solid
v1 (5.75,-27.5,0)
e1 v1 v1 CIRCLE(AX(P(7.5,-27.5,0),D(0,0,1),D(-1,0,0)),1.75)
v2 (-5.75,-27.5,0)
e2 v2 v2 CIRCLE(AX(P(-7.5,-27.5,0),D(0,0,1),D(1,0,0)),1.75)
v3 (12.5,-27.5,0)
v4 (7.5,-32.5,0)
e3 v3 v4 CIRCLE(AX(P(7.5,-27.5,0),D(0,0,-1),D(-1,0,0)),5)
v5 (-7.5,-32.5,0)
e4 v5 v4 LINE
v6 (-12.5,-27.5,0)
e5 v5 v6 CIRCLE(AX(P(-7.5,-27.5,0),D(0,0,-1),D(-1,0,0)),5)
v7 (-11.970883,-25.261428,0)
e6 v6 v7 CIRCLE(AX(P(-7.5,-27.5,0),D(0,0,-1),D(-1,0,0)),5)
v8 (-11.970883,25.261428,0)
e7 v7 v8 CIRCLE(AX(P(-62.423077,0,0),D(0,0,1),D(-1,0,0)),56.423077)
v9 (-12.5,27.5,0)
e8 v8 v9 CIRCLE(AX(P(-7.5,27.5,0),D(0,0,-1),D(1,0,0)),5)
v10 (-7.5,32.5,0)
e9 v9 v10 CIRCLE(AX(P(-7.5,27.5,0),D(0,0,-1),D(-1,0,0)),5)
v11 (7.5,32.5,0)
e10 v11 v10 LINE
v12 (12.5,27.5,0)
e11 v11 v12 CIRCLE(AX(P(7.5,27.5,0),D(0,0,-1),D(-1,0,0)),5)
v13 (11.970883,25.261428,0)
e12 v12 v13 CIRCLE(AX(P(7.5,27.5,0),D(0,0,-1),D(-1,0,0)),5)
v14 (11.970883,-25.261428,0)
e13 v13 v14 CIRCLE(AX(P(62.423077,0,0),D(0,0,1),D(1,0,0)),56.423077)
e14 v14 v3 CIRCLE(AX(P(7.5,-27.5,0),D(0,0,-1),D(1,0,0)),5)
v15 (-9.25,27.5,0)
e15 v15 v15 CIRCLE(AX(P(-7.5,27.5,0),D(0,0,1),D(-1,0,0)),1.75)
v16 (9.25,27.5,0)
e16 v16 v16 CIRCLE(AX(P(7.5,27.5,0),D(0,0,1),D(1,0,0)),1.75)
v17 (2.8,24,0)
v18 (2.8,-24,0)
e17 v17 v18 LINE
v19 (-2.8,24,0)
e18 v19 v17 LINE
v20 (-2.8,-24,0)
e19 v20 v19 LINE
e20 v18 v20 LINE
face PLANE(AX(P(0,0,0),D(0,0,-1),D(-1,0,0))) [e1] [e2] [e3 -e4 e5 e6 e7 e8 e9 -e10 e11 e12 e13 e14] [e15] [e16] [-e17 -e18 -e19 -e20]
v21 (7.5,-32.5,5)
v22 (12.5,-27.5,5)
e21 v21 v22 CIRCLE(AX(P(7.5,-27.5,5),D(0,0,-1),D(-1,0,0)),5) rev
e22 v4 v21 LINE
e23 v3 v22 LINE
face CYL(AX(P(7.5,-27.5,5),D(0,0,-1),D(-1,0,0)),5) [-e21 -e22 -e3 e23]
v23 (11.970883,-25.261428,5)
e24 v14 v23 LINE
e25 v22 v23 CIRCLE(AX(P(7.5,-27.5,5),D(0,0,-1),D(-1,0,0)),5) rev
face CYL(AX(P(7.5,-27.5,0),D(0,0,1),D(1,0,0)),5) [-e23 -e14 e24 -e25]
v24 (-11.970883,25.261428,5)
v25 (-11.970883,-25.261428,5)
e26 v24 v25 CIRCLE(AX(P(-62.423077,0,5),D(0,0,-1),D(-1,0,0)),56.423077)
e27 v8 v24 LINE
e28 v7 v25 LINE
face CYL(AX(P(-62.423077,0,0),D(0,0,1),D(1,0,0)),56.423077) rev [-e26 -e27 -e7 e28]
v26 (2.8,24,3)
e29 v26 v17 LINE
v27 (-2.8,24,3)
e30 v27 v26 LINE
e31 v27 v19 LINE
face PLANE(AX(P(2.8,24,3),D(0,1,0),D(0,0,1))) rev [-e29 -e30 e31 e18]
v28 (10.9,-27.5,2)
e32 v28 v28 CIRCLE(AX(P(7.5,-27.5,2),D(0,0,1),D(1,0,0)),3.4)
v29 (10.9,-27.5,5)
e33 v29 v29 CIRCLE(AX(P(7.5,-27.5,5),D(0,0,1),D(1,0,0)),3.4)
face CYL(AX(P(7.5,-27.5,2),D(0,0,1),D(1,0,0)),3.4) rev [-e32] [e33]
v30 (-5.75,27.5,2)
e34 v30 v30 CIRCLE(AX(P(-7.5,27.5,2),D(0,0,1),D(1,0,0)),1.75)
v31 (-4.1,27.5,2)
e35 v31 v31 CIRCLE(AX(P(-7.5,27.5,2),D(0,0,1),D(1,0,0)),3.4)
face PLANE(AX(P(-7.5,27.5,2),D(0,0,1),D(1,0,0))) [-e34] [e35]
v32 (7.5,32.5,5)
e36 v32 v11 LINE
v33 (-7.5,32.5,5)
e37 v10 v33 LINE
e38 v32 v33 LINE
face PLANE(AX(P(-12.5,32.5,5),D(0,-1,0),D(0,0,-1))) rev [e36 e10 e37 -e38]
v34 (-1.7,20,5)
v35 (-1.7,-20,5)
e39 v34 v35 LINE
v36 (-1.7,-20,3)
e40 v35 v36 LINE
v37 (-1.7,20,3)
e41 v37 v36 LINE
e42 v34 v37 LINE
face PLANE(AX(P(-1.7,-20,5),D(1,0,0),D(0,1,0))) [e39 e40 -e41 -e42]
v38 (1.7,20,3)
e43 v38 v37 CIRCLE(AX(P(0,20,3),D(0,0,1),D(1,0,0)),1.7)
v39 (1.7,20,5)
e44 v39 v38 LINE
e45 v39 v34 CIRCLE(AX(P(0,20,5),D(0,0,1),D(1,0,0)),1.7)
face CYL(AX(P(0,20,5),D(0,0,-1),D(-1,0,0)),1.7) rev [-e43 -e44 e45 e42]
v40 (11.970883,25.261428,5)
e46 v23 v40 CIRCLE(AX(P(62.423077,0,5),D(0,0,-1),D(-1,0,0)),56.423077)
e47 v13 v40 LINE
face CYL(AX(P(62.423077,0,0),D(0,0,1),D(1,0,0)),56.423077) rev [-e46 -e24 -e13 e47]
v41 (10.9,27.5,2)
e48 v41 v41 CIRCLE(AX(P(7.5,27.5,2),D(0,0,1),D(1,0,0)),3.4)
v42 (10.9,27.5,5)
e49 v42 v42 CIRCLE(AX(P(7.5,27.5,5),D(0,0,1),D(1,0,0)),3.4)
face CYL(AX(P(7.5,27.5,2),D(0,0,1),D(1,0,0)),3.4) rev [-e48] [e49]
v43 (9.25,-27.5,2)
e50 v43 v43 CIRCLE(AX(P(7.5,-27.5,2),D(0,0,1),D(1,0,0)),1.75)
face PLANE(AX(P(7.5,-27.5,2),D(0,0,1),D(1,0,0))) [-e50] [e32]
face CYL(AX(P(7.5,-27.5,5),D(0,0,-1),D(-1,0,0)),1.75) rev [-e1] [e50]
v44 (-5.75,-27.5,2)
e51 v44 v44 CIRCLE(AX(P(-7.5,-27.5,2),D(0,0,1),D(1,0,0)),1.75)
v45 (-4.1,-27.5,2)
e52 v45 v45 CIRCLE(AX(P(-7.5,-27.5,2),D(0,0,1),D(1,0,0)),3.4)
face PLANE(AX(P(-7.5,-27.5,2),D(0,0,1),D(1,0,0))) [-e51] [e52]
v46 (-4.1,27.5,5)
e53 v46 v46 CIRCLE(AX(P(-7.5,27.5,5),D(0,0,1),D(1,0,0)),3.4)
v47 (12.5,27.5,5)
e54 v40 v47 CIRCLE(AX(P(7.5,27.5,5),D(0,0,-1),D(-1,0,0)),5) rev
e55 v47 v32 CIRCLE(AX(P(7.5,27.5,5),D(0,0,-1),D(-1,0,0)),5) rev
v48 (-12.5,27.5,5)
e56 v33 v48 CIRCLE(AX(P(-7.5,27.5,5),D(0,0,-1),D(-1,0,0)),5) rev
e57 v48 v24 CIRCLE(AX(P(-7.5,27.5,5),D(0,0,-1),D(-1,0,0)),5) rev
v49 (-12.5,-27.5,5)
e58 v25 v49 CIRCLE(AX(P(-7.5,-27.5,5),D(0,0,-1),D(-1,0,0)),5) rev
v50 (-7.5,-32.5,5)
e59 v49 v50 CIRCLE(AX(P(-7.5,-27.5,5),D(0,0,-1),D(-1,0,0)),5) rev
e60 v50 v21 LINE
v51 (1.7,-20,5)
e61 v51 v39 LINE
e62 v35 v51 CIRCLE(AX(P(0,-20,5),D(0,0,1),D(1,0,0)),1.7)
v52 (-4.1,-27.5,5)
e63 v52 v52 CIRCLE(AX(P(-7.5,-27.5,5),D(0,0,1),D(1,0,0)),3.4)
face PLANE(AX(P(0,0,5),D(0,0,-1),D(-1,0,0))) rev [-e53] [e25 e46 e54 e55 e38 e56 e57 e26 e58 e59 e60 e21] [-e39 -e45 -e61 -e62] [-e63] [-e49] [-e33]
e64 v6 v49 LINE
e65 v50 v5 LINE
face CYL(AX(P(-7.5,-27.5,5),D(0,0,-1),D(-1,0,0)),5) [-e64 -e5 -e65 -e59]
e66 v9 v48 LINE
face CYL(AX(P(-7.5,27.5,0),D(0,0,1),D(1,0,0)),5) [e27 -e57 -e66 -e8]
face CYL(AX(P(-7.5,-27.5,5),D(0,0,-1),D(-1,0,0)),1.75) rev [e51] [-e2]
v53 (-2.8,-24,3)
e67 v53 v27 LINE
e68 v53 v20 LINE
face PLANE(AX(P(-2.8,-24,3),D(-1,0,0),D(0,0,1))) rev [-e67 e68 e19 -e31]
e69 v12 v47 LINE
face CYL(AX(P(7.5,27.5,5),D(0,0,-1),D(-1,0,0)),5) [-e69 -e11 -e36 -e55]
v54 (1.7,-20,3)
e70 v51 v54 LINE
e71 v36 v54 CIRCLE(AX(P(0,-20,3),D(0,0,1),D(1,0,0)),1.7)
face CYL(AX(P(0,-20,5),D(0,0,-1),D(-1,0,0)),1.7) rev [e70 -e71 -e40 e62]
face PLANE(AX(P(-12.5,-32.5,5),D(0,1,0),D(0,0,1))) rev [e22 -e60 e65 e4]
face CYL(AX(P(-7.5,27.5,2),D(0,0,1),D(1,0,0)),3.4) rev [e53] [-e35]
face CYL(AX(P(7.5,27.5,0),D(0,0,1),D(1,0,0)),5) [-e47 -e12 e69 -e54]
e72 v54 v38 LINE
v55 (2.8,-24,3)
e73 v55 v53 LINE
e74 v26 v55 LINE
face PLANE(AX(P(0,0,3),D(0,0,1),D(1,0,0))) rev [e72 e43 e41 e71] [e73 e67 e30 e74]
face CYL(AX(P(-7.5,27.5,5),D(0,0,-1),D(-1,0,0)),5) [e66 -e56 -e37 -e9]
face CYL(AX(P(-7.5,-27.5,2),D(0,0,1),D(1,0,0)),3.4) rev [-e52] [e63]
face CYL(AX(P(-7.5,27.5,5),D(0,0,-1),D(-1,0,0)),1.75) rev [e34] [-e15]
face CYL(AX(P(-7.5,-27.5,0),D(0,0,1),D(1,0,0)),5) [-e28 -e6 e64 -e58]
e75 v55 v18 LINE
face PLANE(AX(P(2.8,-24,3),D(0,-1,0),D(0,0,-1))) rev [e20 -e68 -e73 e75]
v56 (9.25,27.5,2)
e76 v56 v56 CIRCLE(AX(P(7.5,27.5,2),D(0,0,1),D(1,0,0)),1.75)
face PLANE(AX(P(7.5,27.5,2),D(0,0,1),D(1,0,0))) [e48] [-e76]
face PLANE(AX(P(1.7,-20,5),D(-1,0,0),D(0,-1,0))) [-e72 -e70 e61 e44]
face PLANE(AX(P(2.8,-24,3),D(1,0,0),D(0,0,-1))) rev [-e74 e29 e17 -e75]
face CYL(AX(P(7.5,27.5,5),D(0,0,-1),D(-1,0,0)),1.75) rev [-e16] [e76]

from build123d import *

# Parameters (mm, degrees)
ESBO_O1_W                  = 25
ESBO_O1_H                  = 65
ESBO_O1_R                  = 1.75
RESSALTO_EXTRUS_O1_DEPTH   = 5
CORTE_EXTRUS_O3_DEPTH      = 36.178118199
CORTE_EXTRUS_O3_DEPTH_BACK = 36.178118199
FILETE1_R                  = 5
ESBO_O2_R                  = 3.4
CORTE_EXTRUS_O1_DEPTH      = 3
ESBO_O3_W                  = 5.6
ESBO_O3_H                  = 48
CORTE_EXTRUS_O2_DEPTH      = 3


with BuildPart() as part:
    # Esboço1 → Ressalto-extrusão1 (new body)
    with BuildSketch(Plane.XY):
        Rectangle(ESBO_O1_W, ESBO_O1_H)
        with Locations((7.5, 27.5)):
            Circle(ESBO_O1_R, mode=Mode.SUBTRACT)
        with Locations(Location((7.5, -27.5, 0), (0, 0, 180))):
            Circle(ESBO_O1_R, mode=Mode.SUBTRACT)
        with Locations((-7.5, -27.5)):
            Circle(ESBO_O1_R, mode=Mode.SUBTRACT)
        with Locations(Location((-7.5, 27.5, 0), (0, 0, 180))):
            Circle(ESBO_O1_R, mode=Mode.SUBTRACT)
        with BuildLine():
            Line((-1.7, -20), (-1.7, 20))
            ThreePointArc((-1.7, 20), (0, 21.7), (1.7, 20))
            Line((1.7, 20), (1.7, -20))
            ThreePointArc((1.7, -20), (0, -21.7), (-1.7, -20))
        make_face(mode=Mode.SUBTRACT)
    extrude(amount=RESSALTO_EXTRUS_O1_DEPTH)

    # Esboço4 → Corte-extrusão3 (cut, two sides: drawn at the far end of the back side and taken through both)
    with BuildSketch(Plane.XY.offset(5).offset(-CORTE_EXTRUS_O3_DEPTH_BACK)):
        with BuildLine():
            Line((12.5, 27.5), (12.5, -27.5))
            ThreePointArc((12.5, -27.5), (12.365923064, -26.34987273), (11.970882905, -25.261427677))
            ThreePointArc((11.970882905, -25.261427677), (6, 0), (11.970882905, 25.261427677))
            ThreePointArc((11.970882905, 25.261427677), (12.365923064, 26.34987273), (12.5, 27.5))
        make_face()
        with BuildLine():
            Line((-12.5, 27.5), (-12.5, -27.5))
            ThreePointArc((-12.5, -27.5), (-12.365923064, -26.34987273), (-11.970882905, -25.261427677))
            ThreePointArc((-11.970882905, -25.261427677), (-6, 0), (-11.970882905, 25.261427677))
            ThreePointArc((-11.970882905, 25.261427677), (-12.365923064, 26.34987273), (-12.5, 27.5))
        make_face()
    extrude(amount=CORTE_EXTRUS_O3_DEPTH + CORTE_EXTRUS_O3_DEPTH_BACK, mode=Mode.SUBTRACT)

    # Filete1
    filete1_edges = [part.edges().sort_by_distance(p)[0] for p in [
        (-12.5, -32.5, 2.5),
        (12.5, -32.5, 2.5),
        (12.5, 32.5, 2.5),
        (-12.5, 32.5, 2.5),
    ]]
    fillet(filete1_edges, radius=FILETE1_R - 0.0001)  # a hair under: the kernel refuses the full size

    # Esboço2 → Corte-extrusão1 (cut)
    with BuildSketch(Plane.XY.offset(5)):
        with Locations((7.5, 27.5)):
            Circle(ESBO_O2_R)
        with Locations((-7.5, 27.5)):
            Circle(ESBO_O2_R)
        with Locations((-7.5, -27.5)):
            Circle(ESBO_O2_R)
        with Locations((7.5, -27.5)):
            Circle(ESBO_O2_R)
    extrude(amount=-CORTE_EXTRUS_O1_DEPTH, mode=Mode.SUBTRACT)

    # Esboço3 → Corte-extrusão2 (cut)
    with BuildSketch(Plane(origin=(0, 0, 0), x_dir=(-1, 0, 0), z_dir=(0, 0, -1))):
        Rectangle(ESBO_O3_W, ESBO_O3_H)
    extrude(amount=-CORTE_EXTRUS_O2_DEPTH, mode=Mode.SUBTRACT)


solid = part.part
